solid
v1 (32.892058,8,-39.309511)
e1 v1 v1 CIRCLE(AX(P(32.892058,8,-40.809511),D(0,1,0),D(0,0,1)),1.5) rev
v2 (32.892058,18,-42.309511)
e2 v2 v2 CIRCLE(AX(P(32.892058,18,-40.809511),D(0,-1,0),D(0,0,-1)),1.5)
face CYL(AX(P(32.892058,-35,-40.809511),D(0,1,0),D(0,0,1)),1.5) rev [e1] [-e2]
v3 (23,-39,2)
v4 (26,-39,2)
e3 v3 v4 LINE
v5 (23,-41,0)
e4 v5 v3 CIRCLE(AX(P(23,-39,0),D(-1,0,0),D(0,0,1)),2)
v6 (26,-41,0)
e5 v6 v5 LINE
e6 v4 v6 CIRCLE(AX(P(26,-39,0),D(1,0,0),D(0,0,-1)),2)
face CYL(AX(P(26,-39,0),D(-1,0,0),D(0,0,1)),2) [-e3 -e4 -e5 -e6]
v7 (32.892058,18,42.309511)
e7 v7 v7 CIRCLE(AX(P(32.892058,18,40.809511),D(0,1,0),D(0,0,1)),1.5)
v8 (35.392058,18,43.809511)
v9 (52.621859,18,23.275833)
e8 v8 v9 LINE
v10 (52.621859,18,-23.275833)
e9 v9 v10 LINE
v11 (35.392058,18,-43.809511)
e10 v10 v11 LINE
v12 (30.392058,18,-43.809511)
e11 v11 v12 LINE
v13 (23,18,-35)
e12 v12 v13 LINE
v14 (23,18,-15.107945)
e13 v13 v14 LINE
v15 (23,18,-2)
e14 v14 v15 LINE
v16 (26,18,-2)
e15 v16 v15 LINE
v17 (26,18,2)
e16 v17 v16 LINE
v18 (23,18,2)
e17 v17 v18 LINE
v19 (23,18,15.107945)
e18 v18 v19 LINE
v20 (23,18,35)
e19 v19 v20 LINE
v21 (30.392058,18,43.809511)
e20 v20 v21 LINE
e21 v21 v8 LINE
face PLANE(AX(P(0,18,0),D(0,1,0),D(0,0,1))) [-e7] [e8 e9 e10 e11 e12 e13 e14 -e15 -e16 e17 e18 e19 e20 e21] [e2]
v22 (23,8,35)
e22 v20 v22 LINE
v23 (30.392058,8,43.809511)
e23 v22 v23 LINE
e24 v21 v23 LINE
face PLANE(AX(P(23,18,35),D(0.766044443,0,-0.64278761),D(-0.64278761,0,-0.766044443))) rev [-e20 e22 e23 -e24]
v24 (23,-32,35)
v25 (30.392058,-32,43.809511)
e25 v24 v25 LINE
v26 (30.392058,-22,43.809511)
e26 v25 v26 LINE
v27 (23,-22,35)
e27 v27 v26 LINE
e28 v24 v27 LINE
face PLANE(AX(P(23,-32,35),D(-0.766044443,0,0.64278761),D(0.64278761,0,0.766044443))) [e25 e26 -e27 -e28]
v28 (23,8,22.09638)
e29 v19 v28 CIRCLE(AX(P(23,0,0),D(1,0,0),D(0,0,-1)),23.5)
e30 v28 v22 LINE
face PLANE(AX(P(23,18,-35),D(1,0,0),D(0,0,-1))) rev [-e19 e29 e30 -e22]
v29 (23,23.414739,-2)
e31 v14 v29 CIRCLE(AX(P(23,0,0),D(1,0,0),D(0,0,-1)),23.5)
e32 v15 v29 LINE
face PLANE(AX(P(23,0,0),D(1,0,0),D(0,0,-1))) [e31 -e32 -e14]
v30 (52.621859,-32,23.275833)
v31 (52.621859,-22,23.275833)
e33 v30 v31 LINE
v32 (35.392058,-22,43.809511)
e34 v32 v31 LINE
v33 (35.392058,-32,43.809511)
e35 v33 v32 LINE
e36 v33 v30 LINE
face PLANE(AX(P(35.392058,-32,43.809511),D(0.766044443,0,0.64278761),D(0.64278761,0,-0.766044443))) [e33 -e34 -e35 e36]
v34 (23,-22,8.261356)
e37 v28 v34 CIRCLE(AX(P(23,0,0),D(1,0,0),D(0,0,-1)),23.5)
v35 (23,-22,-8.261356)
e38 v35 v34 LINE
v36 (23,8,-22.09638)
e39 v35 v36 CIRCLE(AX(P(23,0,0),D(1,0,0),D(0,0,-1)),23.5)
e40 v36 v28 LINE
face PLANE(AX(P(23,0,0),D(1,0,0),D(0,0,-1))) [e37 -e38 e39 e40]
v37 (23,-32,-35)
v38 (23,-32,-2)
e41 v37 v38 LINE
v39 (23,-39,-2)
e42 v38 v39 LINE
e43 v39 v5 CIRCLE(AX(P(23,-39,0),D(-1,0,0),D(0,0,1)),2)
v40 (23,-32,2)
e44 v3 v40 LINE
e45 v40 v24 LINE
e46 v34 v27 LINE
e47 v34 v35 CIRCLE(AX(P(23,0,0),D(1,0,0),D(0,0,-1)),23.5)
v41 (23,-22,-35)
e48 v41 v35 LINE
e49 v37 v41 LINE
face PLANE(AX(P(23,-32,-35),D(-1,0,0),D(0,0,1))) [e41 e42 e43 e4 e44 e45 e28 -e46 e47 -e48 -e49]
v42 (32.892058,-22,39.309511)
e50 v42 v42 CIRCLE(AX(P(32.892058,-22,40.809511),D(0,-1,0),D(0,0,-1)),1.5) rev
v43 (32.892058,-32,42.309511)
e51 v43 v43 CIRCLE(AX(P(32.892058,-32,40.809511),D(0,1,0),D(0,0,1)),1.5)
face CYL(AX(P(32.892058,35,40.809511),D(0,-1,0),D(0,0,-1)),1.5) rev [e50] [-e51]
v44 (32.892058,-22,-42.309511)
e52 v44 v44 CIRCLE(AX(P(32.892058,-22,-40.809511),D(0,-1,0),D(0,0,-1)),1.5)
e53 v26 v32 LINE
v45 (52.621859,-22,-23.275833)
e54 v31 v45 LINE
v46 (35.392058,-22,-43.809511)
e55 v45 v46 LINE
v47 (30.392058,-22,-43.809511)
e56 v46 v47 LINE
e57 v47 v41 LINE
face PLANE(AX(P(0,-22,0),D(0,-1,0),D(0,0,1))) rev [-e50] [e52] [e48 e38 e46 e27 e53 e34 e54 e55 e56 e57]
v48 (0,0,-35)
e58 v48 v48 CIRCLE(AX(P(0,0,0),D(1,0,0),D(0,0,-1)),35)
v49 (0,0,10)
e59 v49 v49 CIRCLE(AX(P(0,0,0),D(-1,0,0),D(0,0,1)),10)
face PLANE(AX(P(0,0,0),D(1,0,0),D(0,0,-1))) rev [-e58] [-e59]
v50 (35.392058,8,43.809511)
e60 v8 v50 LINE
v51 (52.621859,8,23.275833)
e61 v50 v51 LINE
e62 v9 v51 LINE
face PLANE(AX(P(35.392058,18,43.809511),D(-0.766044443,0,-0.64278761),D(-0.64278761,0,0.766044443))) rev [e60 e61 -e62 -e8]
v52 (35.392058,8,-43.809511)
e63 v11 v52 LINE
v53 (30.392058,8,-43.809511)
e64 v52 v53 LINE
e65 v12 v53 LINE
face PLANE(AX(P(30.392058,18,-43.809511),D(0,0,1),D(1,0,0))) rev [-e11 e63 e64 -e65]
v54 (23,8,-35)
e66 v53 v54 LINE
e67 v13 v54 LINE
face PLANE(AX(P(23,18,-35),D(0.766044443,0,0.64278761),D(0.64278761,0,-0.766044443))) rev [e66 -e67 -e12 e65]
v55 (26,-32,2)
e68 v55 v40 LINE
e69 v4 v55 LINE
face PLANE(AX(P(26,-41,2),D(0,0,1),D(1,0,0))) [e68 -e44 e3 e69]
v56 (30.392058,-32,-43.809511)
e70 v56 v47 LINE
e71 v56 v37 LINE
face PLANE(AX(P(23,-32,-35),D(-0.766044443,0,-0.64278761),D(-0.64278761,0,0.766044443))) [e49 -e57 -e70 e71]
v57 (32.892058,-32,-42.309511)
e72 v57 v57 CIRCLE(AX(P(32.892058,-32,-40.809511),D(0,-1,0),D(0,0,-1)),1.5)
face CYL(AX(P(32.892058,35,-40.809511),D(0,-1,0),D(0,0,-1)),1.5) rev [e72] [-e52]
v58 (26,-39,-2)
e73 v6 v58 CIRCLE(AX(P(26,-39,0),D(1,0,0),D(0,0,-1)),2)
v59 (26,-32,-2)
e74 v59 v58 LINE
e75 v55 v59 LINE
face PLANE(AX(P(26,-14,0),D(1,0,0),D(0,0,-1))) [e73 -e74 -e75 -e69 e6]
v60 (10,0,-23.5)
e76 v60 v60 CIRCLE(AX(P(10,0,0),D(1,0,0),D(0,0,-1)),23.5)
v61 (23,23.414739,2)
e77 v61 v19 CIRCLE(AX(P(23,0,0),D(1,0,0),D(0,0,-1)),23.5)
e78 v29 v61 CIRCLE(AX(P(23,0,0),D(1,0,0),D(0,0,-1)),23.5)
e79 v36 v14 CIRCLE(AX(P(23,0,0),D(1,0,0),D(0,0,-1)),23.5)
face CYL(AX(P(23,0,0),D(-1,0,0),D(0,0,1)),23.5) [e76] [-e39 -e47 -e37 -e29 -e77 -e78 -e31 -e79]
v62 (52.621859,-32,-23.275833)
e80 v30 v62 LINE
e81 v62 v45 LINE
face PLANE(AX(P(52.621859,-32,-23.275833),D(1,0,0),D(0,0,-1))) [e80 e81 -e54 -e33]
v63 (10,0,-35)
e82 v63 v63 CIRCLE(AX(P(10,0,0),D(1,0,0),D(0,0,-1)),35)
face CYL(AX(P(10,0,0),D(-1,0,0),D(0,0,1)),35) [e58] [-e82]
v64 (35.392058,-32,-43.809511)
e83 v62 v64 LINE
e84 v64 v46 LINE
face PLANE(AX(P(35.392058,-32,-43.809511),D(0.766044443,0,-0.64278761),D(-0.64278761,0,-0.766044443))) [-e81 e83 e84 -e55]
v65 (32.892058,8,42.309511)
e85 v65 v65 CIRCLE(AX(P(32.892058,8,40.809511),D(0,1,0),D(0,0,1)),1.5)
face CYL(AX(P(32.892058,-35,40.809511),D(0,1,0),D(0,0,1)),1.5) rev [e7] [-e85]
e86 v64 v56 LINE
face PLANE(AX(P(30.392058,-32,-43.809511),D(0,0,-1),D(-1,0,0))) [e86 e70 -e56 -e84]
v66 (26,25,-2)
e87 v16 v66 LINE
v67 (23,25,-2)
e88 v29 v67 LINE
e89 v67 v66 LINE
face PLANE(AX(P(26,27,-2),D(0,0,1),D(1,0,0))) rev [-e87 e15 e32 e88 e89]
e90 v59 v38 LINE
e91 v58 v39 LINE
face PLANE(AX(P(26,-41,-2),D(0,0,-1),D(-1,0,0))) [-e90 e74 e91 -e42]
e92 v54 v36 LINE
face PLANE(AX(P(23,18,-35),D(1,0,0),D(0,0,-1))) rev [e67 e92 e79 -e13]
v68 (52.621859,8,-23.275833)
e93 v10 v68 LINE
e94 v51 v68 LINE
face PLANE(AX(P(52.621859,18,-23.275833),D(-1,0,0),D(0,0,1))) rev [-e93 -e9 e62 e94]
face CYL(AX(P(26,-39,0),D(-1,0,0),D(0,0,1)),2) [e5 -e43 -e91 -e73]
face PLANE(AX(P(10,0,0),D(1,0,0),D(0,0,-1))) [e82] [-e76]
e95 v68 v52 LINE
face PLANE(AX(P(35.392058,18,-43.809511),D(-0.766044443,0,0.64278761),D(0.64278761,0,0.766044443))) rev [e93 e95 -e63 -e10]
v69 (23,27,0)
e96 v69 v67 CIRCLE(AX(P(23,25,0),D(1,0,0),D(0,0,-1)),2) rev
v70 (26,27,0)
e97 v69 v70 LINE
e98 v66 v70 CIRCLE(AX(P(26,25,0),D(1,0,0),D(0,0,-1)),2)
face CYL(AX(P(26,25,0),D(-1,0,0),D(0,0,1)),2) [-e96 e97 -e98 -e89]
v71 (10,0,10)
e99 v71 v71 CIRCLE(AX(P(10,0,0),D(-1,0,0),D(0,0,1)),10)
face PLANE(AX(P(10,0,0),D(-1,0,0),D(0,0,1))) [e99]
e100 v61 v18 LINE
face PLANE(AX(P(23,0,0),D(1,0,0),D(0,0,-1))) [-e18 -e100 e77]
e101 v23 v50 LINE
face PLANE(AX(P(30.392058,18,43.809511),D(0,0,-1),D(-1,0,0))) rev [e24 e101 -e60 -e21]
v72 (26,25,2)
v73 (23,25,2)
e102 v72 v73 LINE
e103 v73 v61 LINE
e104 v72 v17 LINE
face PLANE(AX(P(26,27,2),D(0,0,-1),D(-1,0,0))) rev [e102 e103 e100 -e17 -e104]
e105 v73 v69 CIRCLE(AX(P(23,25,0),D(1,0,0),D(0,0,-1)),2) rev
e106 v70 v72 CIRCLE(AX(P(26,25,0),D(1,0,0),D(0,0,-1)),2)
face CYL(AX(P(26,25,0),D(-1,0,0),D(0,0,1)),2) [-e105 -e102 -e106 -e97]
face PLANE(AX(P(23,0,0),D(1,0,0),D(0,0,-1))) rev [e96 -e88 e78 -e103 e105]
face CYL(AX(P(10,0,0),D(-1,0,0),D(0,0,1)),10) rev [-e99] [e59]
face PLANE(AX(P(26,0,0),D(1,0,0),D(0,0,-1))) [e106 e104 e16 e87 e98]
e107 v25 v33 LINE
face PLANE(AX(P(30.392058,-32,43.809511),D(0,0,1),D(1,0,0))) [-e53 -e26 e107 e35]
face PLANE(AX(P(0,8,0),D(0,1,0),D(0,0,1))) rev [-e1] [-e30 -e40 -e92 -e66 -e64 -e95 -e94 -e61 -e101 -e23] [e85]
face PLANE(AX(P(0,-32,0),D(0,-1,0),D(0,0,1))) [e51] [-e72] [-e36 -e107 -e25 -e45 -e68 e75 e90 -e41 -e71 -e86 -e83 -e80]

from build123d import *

# Parameters (mm, degrees)
SKETCH1_R               = 35
BOSS_EXTRUDE1_DEPTH     = 10
SKETCH2_R               = 23.5
BOSS_EXTRUDE2_DEPTH     = 13
BOSS_EXTRUDE3_DEPTH     = 5
SKETCH5_R               = 1.5
CUT_EXTRUDE1_DEPTH      = 87.587143002
SKETCH9_W               = 4
SKETCH9_H               = 9
BOSS_EXTRUDE8_DEPTH     = 3
FILLET3_R               = 2
SKETCH11_R              = 10
CUT_EXTRUDE2_DEPTH      = 10
MIRROR2_COPY_1_SKETCH_R = 1.5
MIRROR2_COPY_1_DEPTH    = 87.587143002
FILLET3_OF_MIRROR2_R    = 2


with BuildPart() as part:
    # Sketch1 → Boss-Extrude1 (new body)
    with BuildSketch(Plane(origin=(0, 0, 0), x_dir=(0, 0, -1), z_dir=(1, 0, 0))):
        Circle(SKETCH1_R)
    extrude(amount=BOSS_EXTRUDE1_DEPTH)

    # Sketch2 → Boss-Extrude2 (add)
    with BuildSketch(Plane(origin=(10, 0, 0), x_dir=(0, 0, -1), z_dir=(1, 0, 0))):
        with Locations(Location((0, 0, 0), (0, 0, 180))):
            Circle(SKETCH2_R)
    extrude(amount=BOSS_EXTRUDE2_DEPTH)

    # Sketch4 → Boss-Extrude3 (add, symmetric)
    with BuildSketch(Plane(origin=(0, 13, 0), x_dir=(1, 0, 0), z_dir=(0, 1, 0))):
        Polygon((23, 35), (23, -35), (30.392057511, -43.809511096), (35.392057511, -43.809511096), (52.621859248, -23.275832977), (52.621859248, 23.275832977), (35.392057511, 43.809511096), (30.392057511, 43.809511096), align=None)
    boss_extrude3 = extrude(amount=BOSS_EXTRUDE3_DEPTH, both=True)

    # Sketch5 → Cut-Extrude1 (cut, through all)
    with BuildSketch(Plane(origin=(0, 18, 0), x_dir=(1, 0, 0), z_dir=(0, 1, 0))):
        with Locations(Location((32.892057511, -40.809511096, 0), (0, 0, 270))):
            Circle(SKETCH5_R)
    cut_extrude1 = extrude(amount=-CUT_EXTRUDE1_DEPTH, mode=Mode.SUBTRACT)

    # Mirror1: Cut-Extrude1 across plane
    add(cut_extrude1.mirror(Plane.XY), mode=Mode.SUBTRACT)

    # Sketch9 → Boss-Extrude8 (add)
    with BuildSketch(Plane(origin=(23, 0, 0), x_dir=(0, 0, -1), z_dir=(1, 0, 0))):
        with Locations((0, 22.5)):
            Rectangle(SKETCH9_W, SKETCH9_H)
    boss_extrude8 = extrude(amount=BOSS_EXTRUDE8_DEPTH)

    # Fillet3
    fillet3_edges = [part.edges().sort_by_distance(p)[0] for p in [
        (24.5, 27, -2),
        (24.5, 27, 2),
    ]]
    fillet(fillet3_edges, radius=FILLET3_R - 0.0001)  # a hair under: the kernel refuses the full size

    # Sketch11 → Cut-Extrude2 (cut)
    with BuildSketch(Plane.ZY):
        Circle(SKETCH11_R)
    extrude(amount=-CUT_EXTRUDE2_DEPTH, mode=Mode.SUBTRACT)

    # Mirror2: Boss-Extrude3, Cut-Extrude1, Boss-Extrude8 across plane
    add(boss_extrude3.mirror(Plane(origin=(0, -7, 0), x_dir=(0, 0, 1), z_dir=(0, -1, 0))))
    add(cut_extrude1.mirror(Plane(origin=(0, -7, 0), x_dir=(0, 0, 1), z_dir=(0, -1, 0))), mode=Mode.SUBTRACT)
    add(boss_extrude8.mirror(Plane(origin=(0, -7, 0), x_dir=(0, 0, 1), z_dir=(0, -1, 0))))

    # Mirror2 copy 1 sketch → Mirror2 copy 1 (cut, through all)
    with BuildSketch(Plane.XZ.offset(32)):
        with Locations(Location((32.892057511, -40.809511096, 0), (0, 0, 270))):
            Circle(MIRROR2_COPY_1_SKETCH_R)
    extrude(amount=-MIRROR2_COPY_1_DEPTH, mode=Mode.SUBTRACT)

    # Fillet3 of Mirror2
    fillet3_of_mirror2_edges = [part.edges().sort_by_distance(p)[0] for p in [
        (24.5, -41, -2),
        (24.5, -41, 2),
    ]]
    fillet(fillet3_of_mirror2_edges, radius=FILLET3_OF_MIRROR2_R - 0.0001)  # a hair under: the kernel refuses the full size


solid = part.part
